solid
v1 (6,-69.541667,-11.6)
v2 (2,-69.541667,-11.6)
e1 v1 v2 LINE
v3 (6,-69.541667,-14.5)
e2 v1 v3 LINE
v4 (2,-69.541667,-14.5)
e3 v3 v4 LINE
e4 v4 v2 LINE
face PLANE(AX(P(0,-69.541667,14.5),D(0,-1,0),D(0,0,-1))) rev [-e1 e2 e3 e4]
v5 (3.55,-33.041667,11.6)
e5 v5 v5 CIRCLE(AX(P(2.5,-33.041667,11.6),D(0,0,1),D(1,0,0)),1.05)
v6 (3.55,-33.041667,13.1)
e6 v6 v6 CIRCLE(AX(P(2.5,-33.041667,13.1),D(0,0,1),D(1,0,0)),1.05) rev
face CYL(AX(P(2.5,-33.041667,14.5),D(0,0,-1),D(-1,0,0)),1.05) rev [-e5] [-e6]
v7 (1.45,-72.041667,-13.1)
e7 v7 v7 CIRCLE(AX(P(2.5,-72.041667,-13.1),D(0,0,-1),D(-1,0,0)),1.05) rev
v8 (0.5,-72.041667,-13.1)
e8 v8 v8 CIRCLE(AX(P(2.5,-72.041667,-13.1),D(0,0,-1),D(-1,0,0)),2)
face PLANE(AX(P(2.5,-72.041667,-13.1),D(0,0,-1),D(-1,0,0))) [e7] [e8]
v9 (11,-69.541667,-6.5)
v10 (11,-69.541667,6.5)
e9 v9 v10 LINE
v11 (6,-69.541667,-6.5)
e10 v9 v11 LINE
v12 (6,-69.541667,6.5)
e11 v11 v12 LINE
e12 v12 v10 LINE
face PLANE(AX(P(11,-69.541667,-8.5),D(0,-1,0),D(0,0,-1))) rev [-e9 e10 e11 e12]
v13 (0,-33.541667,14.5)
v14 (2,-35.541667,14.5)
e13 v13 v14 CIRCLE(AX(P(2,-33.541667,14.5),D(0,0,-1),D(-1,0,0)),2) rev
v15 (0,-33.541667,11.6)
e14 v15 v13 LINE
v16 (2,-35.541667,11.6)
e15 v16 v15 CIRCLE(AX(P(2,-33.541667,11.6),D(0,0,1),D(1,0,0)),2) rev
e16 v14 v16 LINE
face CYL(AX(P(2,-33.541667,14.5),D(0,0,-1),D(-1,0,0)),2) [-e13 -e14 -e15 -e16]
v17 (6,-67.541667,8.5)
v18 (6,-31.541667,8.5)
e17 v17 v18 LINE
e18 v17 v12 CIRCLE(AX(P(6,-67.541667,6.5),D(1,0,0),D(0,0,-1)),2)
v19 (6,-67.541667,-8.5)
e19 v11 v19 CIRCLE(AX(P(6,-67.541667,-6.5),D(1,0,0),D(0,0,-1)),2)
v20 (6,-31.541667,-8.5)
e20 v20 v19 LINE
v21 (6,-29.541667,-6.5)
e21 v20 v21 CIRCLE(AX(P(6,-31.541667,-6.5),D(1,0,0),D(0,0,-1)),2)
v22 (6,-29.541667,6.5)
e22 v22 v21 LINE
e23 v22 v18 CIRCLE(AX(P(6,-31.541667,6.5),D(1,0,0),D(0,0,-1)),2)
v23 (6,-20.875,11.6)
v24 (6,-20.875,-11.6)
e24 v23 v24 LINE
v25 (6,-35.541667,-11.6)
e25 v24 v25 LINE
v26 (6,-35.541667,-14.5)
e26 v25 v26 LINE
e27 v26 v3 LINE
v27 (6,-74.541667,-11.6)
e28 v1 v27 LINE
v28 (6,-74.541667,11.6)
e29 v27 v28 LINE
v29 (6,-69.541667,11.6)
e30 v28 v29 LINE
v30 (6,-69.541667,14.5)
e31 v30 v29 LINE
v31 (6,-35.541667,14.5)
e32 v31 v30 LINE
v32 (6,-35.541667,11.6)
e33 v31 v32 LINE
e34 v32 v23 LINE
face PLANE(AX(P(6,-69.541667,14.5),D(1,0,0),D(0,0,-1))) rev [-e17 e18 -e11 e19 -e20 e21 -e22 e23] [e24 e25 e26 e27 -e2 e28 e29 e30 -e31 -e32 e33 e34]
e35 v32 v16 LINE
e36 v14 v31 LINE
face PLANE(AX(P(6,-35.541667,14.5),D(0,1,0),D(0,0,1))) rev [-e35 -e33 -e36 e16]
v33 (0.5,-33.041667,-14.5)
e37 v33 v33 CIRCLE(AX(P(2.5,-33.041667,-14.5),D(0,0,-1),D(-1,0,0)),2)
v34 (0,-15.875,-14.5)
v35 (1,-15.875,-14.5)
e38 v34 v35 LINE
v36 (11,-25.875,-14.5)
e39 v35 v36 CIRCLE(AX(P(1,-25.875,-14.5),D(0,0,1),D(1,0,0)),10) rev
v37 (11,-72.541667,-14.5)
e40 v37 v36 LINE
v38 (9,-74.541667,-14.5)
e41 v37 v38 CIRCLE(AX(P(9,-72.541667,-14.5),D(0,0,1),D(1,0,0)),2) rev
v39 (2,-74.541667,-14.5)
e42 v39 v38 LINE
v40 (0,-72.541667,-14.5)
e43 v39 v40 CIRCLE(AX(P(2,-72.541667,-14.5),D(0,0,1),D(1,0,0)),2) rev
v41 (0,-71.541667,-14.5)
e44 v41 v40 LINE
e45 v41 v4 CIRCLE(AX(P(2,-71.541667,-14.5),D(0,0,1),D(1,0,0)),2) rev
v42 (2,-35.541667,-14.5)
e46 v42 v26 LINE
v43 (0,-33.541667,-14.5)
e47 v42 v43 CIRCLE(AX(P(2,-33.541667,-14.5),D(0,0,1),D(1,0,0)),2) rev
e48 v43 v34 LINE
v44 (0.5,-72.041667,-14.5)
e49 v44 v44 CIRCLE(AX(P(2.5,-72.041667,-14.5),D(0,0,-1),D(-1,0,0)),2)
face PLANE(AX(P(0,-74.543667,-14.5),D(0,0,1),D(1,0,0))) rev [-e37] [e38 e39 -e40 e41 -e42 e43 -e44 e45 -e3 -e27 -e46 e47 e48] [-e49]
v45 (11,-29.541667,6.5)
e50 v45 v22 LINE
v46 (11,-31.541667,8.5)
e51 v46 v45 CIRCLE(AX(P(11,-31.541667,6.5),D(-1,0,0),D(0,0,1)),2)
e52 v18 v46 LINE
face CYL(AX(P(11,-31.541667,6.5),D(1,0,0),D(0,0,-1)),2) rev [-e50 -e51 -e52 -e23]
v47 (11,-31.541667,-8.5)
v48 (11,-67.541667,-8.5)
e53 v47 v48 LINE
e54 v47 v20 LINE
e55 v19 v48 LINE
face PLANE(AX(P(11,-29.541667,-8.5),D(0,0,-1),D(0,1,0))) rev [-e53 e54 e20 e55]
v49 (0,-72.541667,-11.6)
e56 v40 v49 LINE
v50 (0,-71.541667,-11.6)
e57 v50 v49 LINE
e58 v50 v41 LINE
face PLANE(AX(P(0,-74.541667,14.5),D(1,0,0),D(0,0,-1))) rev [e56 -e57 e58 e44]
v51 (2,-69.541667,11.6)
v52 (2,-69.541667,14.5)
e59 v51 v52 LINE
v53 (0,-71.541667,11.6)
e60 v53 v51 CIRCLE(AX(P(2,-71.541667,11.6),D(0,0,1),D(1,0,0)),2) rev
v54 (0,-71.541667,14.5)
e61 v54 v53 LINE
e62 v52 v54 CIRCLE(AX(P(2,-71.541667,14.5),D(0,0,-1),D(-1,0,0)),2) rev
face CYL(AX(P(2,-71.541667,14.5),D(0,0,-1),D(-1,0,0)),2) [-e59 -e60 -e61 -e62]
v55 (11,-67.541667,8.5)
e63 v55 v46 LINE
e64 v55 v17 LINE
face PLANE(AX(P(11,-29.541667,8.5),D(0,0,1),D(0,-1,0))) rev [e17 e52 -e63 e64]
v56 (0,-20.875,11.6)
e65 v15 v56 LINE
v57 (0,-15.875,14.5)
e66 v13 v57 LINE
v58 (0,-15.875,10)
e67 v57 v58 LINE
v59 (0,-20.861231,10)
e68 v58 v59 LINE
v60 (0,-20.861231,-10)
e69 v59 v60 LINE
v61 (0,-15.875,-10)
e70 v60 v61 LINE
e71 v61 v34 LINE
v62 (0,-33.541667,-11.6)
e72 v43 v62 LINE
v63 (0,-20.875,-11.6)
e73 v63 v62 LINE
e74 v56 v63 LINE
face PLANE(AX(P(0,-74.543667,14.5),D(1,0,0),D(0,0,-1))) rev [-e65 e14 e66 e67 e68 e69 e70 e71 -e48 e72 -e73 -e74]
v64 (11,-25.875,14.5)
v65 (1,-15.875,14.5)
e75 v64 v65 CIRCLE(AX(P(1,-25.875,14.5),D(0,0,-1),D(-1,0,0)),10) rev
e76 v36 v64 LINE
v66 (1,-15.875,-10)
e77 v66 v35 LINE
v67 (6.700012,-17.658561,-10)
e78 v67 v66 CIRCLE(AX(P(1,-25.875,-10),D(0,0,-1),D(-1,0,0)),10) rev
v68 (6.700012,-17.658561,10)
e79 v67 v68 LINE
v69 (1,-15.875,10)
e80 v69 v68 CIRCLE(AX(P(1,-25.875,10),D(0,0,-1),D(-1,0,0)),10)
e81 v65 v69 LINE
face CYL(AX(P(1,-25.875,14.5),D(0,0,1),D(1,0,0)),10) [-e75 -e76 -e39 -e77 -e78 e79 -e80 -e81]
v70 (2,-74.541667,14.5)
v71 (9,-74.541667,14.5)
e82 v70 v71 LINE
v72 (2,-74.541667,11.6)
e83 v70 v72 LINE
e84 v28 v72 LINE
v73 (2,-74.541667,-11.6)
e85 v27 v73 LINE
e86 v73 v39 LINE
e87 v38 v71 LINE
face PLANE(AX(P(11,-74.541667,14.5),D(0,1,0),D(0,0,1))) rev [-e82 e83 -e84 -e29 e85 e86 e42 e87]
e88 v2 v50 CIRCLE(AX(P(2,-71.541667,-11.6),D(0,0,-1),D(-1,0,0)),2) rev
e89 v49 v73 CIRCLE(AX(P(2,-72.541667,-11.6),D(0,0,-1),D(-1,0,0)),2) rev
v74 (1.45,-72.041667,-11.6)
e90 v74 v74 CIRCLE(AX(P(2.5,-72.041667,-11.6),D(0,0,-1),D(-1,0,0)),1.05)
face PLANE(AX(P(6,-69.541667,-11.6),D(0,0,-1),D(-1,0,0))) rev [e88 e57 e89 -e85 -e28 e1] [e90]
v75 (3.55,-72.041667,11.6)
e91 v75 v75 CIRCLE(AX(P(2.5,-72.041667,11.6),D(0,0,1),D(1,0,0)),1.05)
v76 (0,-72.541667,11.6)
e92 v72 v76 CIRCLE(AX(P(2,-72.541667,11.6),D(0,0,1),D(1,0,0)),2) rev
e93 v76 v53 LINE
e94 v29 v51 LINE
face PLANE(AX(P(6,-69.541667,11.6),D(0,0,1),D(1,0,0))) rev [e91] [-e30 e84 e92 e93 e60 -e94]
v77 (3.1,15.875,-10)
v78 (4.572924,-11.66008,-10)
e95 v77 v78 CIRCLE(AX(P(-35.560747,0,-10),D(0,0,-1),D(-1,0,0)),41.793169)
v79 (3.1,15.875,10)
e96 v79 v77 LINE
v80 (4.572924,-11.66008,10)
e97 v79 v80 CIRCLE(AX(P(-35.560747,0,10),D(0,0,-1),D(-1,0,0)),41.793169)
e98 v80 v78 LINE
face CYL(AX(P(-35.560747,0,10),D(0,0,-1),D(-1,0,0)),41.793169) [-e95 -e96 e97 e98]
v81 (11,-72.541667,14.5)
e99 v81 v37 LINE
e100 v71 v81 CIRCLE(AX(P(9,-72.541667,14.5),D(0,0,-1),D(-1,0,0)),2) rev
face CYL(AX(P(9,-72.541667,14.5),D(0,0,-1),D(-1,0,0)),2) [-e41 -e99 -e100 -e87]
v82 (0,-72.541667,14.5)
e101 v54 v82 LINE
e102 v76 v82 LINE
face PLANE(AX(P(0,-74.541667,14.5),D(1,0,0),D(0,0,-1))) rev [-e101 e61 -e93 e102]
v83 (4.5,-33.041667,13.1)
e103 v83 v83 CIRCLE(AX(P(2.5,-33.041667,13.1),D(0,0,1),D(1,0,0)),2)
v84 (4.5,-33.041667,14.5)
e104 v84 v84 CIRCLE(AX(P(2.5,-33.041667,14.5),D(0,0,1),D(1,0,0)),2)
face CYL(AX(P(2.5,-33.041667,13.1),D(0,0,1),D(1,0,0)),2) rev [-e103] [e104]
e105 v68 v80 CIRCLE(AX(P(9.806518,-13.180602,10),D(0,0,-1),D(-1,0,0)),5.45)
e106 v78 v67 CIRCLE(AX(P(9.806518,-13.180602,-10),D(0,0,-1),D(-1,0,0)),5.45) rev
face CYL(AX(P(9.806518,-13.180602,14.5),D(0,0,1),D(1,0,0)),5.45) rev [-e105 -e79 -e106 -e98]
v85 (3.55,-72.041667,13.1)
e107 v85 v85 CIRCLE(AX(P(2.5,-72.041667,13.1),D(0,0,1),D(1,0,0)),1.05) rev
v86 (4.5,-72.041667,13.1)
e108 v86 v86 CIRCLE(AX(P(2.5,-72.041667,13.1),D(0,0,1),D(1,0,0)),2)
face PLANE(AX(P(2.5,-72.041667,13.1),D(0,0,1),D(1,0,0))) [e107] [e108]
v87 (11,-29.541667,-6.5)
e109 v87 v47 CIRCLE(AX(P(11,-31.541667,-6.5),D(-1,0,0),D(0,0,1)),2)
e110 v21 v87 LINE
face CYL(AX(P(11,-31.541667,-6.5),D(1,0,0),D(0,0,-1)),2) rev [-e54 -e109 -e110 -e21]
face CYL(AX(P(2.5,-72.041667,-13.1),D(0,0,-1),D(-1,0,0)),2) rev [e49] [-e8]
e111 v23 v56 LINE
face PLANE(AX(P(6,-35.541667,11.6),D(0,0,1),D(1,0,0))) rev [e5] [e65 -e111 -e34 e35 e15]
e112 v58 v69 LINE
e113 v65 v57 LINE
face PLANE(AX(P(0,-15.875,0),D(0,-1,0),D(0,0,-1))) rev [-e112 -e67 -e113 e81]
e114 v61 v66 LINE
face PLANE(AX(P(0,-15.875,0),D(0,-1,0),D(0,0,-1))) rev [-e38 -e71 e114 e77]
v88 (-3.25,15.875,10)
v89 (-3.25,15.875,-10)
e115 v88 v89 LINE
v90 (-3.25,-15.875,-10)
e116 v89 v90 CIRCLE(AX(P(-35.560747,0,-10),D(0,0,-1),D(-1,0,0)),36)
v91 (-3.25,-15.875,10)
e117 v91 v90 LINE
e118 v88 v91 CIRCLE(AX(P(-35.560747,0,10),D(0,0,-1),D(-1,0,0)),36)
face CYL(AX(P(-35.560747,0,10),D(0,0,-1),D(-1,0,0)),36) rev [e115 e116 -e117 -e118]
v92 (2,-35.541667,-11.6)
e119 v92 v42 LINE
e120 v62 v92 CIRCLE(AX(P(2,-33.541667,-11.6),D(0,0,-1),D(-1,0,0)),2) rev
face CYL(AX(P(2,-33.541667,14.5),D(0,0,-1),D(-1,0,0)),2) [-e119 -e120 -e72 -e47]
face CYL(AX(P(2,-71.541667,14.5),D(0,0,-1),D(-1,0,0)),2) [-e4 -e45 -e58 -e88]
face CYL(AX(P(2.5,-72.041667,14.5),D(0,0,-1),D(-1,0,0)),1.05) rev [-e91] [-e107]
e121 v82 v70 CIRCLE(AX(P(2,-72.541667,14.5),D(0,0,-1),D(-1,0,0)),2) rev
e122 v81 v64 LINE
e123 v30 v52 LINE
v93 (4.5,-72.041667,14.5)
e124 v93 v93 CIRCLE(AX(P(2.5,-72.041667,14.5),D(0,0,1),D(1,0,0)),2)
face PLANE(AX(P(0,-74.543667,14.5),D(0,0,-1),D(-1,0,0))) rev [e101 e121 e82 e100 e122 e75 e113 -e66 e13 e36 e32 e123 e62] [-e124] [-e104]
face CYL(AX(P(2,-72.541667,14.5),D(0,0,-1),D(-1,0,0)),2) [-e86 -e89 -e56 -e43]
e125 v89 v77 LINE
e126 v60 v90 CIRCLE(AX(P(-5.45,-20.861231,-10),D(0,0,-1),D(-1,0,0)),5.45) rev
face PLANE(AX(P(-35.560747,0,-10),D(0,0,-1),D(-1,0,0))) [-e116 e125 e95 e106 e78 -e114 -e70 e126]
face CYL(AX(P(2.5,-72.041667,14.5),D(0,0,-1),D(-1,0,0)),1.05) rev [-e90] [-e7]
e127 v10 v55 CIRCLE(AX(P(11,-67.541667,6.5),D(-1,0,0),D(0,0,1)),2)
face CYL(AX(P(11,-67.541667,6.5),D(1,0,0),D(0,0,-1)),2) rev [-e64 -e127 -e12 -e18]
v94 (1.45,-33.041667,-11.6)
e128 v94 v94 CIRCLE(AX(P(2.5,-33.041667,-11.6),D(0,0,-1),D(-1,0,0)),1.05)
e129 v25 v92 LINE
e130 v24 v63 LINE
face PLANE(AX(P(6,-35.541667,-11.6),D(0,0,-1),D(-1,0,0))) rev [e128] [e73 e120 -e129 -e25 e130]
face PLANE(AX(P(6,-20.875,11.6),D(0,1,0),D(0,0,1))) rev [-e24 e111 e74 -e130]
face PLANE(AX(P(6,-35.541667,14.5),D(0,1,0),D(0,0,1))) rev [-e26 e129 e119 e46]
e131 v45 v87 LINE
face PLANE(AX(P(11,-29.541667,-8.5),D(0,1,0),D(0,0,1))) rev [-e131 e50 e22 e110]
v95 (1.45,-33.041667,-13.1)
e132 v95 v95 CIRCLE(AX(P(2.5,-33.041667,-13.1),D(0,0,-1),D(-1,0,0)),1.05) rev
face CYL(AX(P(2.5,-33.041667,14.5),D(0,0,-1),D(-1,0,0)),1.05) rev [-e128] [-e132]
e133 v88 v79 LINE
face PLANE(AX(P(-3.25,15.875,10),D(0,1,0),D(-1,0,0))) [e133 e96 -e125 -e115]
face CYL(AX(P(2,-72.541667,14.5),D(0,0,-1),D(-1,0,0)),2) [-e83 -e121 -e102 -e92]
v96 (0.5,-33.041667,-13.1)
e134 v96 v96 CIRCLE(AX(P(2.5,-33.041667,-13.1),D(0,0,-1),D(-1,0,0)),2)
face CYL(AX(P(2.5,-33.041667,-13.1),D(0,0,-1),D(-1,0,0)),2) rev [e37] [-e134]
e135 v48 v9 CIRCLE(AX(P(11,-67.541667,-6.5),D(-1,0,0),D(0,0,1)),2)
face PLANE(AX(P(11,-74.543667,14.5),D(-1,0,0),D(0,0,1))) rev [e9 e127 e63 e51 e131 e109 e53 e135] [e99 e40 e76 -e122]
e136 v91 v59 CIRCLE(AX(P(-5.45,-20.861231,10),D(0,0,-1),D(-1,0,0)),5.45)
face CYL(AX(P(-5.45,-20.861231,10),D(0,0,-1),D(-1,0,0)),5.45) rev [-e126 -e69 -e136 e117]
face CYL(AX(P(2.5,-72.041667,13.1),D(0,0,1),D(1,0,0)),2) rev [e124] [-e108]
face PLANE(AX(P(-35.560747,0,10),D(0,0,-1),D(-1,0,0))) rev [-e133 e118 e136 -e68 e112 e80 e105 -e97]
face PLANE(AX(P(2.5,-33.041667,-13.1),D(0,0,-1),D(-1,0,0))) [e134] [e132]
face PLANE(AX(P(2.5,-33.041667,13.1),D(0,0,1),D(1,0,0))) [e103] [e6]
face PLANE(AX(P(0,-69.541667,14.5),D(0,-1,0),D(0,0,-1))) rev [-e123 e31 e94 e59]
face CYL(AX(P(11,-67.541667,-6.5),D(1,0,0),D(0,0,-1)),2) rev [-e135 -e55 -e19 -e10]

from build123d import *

# Parameters (mm, degrees)
BOSS_EXTRUDE5_DEPTH = 10
BOSS_EXTRUDE6_DEPTH = 14.5
BOSS_EXTRUDE7_REACH = 63.425
SKETCH28_W          = 11
SKETCH28_H          = 29
SKETCH37_W          = 23.2
SKETCH37_H          = 14.666666667
CUT_EXTRUDE10_DEPTH = 6
SKETCH38_W          = 23.2
SKETCH38_H          = 5
CUT_EXTRUDE11_DEPTH = 6
SKETCH39_R          = 1.05
CUT_EXTRUDE12_DEPTH = 81.736980805
SKETCH40_R          = 2
CUT_EXTRUDE13_DEPTH = 1.4
SKETCH41_R          = 2
CUT_EXTRUDE14_DEPTH = 1.4
SKETCH42_W          = 17
SKETCH42_H          = 40
CUT_EXTRUDE15_DEPTH = 77.175521458
FILLET2_R           = 2
CUT_EXTRUDE16_DEPTH = 80.232001549
BOSS_EXTRUDE8_DEPTH = 10
FILLET3_R           = 10
FILLET4_R           = 5.45


with BuildPart() as part:
    # Sketch25 → Boss-Extrude5 (new, symmetric)
    with BuildSketch(Plane.XY):
        with BuildLine():
            Line((0, 15.875), (6.35, 15.875))
            ThreePointArc((6.35, 15.875), (9.840958299, 0), (6.35, -15.875))
            Line((6.35, -15.875), (0, -15.875))
            ThreePointArc((0, -15.875), (4.187196601, 0), (0, 15.875))
        make_face()
    extrude(amount=BOSS_EXTRUDE5_DEPTH, both=True)


with BuildPart() as body_2:
    # Sketch27 → Boss-Extrude6 (new, symmetric)
    with BuildSketch(Plane.XY):
        Polygon((0, -30.541666667), (11, -30.541666667), (11, -74.541666667), (0, -74.541666667), (0, -69.541666667), (6, -69.541666667), (6, -35.541666667), (0, -35.541666667), align=None)
    extrude(amount=BOSS_EXTRUDE6_DEPTH, both=True)

    # Sketch28 → Boss-Extrude7 (add, up to next)
    with BuildSketch(Plane.XZ.offset(15.875), mode=Mode.PRIVATE) as boss_extrude7_sk1:
        with Locations((5.5, 0)):
            Rectangle(SKETCH28_W, SKETCH28_H)
    boss_extrude7_tool1 = extrude(boss_extrude7_sk1.sketch, amount=BOSS_EXTRUDE7_REACH, mode=Mode.PRIVATE) - body_2.part

    add(part.part)  # Boss-Extrude7 merges part
    add(boss_extrude7_tool1.solids().sort_by_distance((5.5, -15.875, 0))[0])

    # Sketch37 → Cut-Extrude10 (cut)
    with BuildSketch(Plane.ZY):
        with Locations((0, -28.208333334)):
            Rectangle(SKETCH37_W, SKETCH37_H)
    extrude(amount=-CUT_EXTRUDE10_DEPTH, mode=Mode.SUBTRACT)

    # Sketch38 → Cut-Extrude11 (cut)
    with BuildSketch(Plane.ZY):
        with Locations((0, -72.041666667)):
            Rectangle(SKETCH38_W, SKETCH38_H)
    extrude(amount=-CUT_EXTRUDE11_DEPTH, mode=Mode.SUBTRACT)

    # Sketch39 → Cut-Extrude12 (cut, through all)
    with BuildSketch(Plane(origin=(0, 0, -14.5), x_dir=(-1, 0, 0), z_dir=(0, 0, -1))):
        with Locations((-2.5, -33.041666667)):
            Circle(SKETCH39_R)
        with Locations((-2.5, -72.041666667)):
            Circle(SKETCH39_R)
    extrude(amount=-CUT_EXTRUDE12_DEPTH, mode=Mode.SUBTRACT)

    # Sketch40 → Cut-Extrude13 (cut)
    with BuildSketch(Plane(origin=(0, 0, -14.5), x_dir=(-1, 0, 0), z_dir=(0, 0, -1))):
        with Locations((-2.5, -33.041666667)):
            Circle(SKETCH40_R)
        with Locations((-2.5, -72.041666667)):
            Circle(SKETCH40_R)
    extrude(amount=-CUT_EXTRUDE13_DEPTH, mode=Mode.SUBTRACT)

    # Sketch41 → Cut-Extrude14 (cut)
    with BuildSketch(Plane.XY.offset(14.5)):
        with Locations(Location((2.5, -33.041666667, 0), (0, 0, 180))):
            Circle(SKETCH41_R)
        with Locations(Location((2.5, -72.041666667, 0), (0, 0, 180))):
            Circle(SKETCH41_R)
    extrude(amount=-CUT_EXTRUDE14_DEPTH, mode=Mode.SUBTRACT)

    # Sketch42 → Cut-Extrude15 (cut, through all)
    with BuildSketch(Plane.ZY.offset(-6)):
        with Locations((0, -49.541666667)):
            Rectangle(SKETCH42_W, SKETCH42_H)
    extrude(amount=-CUT_EXTRUDE15_DEPTH, mode=Mode.SUBTRACT)

    # Fillet2
    fillet2_edges = [body_2.edges().sort_by_distance(p)[0] for p in [
        (8.5, -69.541666667, -8.5),
        (8.5, -29.541666667, -8.5),
        (8.5, -29.541666667, 8.5),
        (8.5, -69.541666667, 8.5),
        (0, -35.541666667, 13.05),
        (0, -69.541666667, 13.05),
        (0, -74.541666667, 13.05),
        (11, -74.541666667, 0),
        (0, -35.541666667, -13.05),
        (0, -74.541666667, -13.05),
        (0, -69.541666667, -13.05),
    ]]
    fillet(fillet2_edges, radius=FILLET2_R)

    # Sketch44 → Cut-Extrude16 (cut, through all)
    with BuildSketch(Plane.XY.offset(10)):
        with BuildLine():
            Line((6.35, -15.875), (0, -15.875))
            ThreePointArc((0, -15.875), (4.187196601, 0), (0, 15.875))
            Line((0, 15.875), (6.35, 15.875))
            ThreePointArc((6.35, 15.875), (9.840958299, 0), (6.35, -15.875))
        make_face()
    extrude(amount=-CUT_EXTRUDE16_DEPTH, mode=Mode.SUBTRACT)

    # Sketch43 → Boss-Extrude8 (add, symmetric)
    with BuildSketch(Plane.XY):
        with BuildLine():
            Line((-3.25, 15.875), (3.1, 15.875))
            ThreePointArc((3.1, 15.875), (6.232422098, 0), (3.1, -15.875))
            Line((3.1, -15.875), (-3.25, -15.875))
            ThreePointArc((-3.25, -15.875), (0.439252949, 0), (-3.25, 15.875))
        make_face()
    extrude(amount=BOSS_EXTRUDE8_DEPTH, both=True)

    # Fillet3
    # the kernel refuses this fillet: 10 mm, written as the material it takes off along each edge
    with BuildSketch(Plane(origin=(11, -15.875, 39.5), x_dir=(-1, 0, 0), z_dir=(0, 0, -1))) as fillet3_piece_1_section:
        with BuildLine():
            CenterArc((FILLET3_R, -FILLET3_R), FILLET3_R, 90, 90)
            Line((0, -FILLET3_R), (0, 0))
            Line((0, 0), (FILLET3_R, 0))
        make_face()
    fillet3_piece_1 = extrude(amount=79, mode=Mode.PRIVATE)
    fillet3_piece_1 = split(fillet3_piece_1, bisect_by=Plane(origin=(2.190951885, -15.815672455, 10), z_dir=(0, 0, 1)), keep=Keep.TOP, mode=Mode.PRIVATE)
    fillet3_piece_1 = fillet3_piece_1 & Plane(origin=(-35.560747051, 0, 24.75), x_dir=(0.925049424055658, 0.3798467625955178, 0), z_dir=(0, 0, 1)) * Cylinder(41.793169149, 198, mode=Mode.PRIVATE)
    add(fillet3_piece_1, mode=Mode.SUBTRACT)
    with BuildSketch(Plane(origin=(11, -15.875, 39.5), x_dir=(-1, 0, 0), z_dir=(0, 0, -1))) as fillet3_piece_2_section:
        with BuildLine():
            CenterArc((FILLET3_R, -FILLET3_R), FILLET3_R, 90, 90)
            Line((0, -FILLET3_R), (0, 0))
            Line((0, 0), (FILLET3_R, 0))
        make_face()
    fillet3_piece_2 = extrude(amount=79, mode=Mode.PRIVATE)
    fillet3_piece_2 = split(fillet3_piece_2, bisect_by=Plane(origin=(8.886802667, -18.192463431, 10), z_dir=(0, 0, 1)), keep=Keep.TOP, mode=Mode.PRIVATE)
    fillet3_piece_2 = fillet3_piece_2 - Plane(origin=(-35.560747051, 0, 24.75), x_dir=(0.925049424055658, 0.3798467625955178, 0), z_dir=(0, 0, 1)) * Cylinder(41.793169149, 198, mode=Mode.PRIVATE)
    add(fillet3_piece_2, mode=Mode.SUBTRACT)
    with BuildSketch(Plane(origin=(11, -15.875, 39.5), x_dir=(-1, 0, 0), z_dir=(0, 0, -1))) as fillet3_piece_3_section:
        with BuildLine():
            CenterArc((FILLET3_R, -FILLET3_R), FILLET3_R, 90, 90)
            Line((0, -FILLET3_R), (0, 0))
            Line((0, 0), (FILLET3_R, 0))
        make_face()
    fillet3_piece_3 = extrude(amount=79, mode=Mode.PRIVATE)
    fillet3_piece_3 = split(fillet3_piece_3, bisect_by=Plane(origin=(8.886802667, -18.192463431, 10), z_dir=(0, 0, -1)), keep=Keep.TOP, mode=Mode.PRIVATE)
    fillet3_piece_3 = fillet3_piece_3 - Plane(origin=(-35.560747051, 0, 0), x_dir=(0.925049424055658, 0.3798467625955178, 0), z_dir=(0, 0, 1)) * Cylinder(41.793169149, 198, mode=Mode.PRIVATE)
    fillet3_piece_3 = split(fillet3_piece_3, bisect_by=Plane(origin=(8.886802667, -18.192463431, -10), z_dir=(0, 0, 1)), keep=Keep.TOP, mode=Mode.PRIVATE)
    add(fillet3_piece_3, mode=Mode.SUBTRACT)
    with BuildSketch(Plane(origin=(11, -15.875, 39.5), x_dir=(-1, 0, 0), z_dir=(0, 0, -1))) as fillet3_piece_4_section:
        with BuildLine():
            CenterArc((FILLET3_R, -FILLET3_R), FILLET3_R, 90, 90)
            Line((0, -FILLET3_R), (0, 0))
            Line((0, 0), (FILLET3_R, 0))
        make_face()
    fillet3_piece_4 = extrude(amount=79, mode=Mode.PRIVATE)
    fillet3_piece_4 = fillet3_piece_4 & Plane(origin=(-35.560747051, 0, -24.75), x_dir=(0.925049424055658, 0.3798467625955178, 0), z_dir=(0, 0, 1)) * Cylinder(41.793169149, 198, mode=Mode.PRIVATE)
    fillet3_piece_4 = split(fillet3_piece_4, bisect_by=Plane(origin=(2.190951885, -15.815672455, -10), z_dir=(0, 0, -1)), keep=Keep.TOP, mode=Mode.PRIVATE)
    add(fillet3_piece_4, mode=Mode.SUBTRACT)
    with BuildSketch(Plane(origin=(11, -15.875, 39.5), x_dir=(-1, 0, 0), z_dir=(0, 0, -1))) as fillet3_piece_5_section:
        with BuildLine():
            CenterArc((FILLET3_R, -FILLET3_R), FILLET3_R, 90, 90)
            Line((0, -FILLET3_R), (0, 0))
            Line((0, 0), (FILLET3_R, 0))
        make_face()
    fillet3_piece_5 = extrude(amount=79, mode=Mode.PRIVATE)
    fillet3_piece_5 = fillet3_piece_5 - Plane(origin=(-35.560747051, 0, -24.75), x_dir=(0.925049424055658, 0.3798467625955178, 0), z_dir=(0, 0, 1)) * Cylinder(41.793169149, 198, mode=Mode.PRIVATE)
    fillet3_piece_5 = split(fillet3_piece_5, bisect_by=Plane(origin=(8.886802667, -18.192463431, -10), z_dir=(0, 0, -1)), keep=Keep.TOP, mode=Mode.PRIVATE)
    add(fillet3_piece_5, mode=Mode.SUBTRACT)

    # Fillet4
    # the kernel refuses this fillet: 5.45 mm, written as the material it adds along each edge
    with BuildSketch(Plane(origin=(0, -15.875, 10), x_dir=(-1, 0, 0), z_dir=(0, 0, -1))) as fillet4_piece_1:
        with BuildLine():
            CenterArc((5.45, -4.986231042), FILLET4_R, 113.807792078, 66.192207922)
            Line((0, -4.986231042), (0, 0))
            Line((0, 0), (3.25, 0))
        make_face()
    extrude(amount=20)
    with BuildSketch(Plane(origin=(3.015126937, -16.080140969, -10), x_dir=(0.33239794280209367, 0.9431392302417156, 0), z_dir=(0, 0, 1))) as fillet4_piece_2:
        with BuildLine():
            CenterArc((4.992113304, -5.441426809), FILLET4_R, 93.214160673, 71.449916977)
            ThreePointArc((-0.263821953, -4.000023125), (0.07058047, -2.013366907), (0, 0))
            ThreePointArc((0, 0), (2.343270621, -0.065743272), (4.686541241, 0))
        make_face()
    extrude(amount=20)


solid = body_2.part
